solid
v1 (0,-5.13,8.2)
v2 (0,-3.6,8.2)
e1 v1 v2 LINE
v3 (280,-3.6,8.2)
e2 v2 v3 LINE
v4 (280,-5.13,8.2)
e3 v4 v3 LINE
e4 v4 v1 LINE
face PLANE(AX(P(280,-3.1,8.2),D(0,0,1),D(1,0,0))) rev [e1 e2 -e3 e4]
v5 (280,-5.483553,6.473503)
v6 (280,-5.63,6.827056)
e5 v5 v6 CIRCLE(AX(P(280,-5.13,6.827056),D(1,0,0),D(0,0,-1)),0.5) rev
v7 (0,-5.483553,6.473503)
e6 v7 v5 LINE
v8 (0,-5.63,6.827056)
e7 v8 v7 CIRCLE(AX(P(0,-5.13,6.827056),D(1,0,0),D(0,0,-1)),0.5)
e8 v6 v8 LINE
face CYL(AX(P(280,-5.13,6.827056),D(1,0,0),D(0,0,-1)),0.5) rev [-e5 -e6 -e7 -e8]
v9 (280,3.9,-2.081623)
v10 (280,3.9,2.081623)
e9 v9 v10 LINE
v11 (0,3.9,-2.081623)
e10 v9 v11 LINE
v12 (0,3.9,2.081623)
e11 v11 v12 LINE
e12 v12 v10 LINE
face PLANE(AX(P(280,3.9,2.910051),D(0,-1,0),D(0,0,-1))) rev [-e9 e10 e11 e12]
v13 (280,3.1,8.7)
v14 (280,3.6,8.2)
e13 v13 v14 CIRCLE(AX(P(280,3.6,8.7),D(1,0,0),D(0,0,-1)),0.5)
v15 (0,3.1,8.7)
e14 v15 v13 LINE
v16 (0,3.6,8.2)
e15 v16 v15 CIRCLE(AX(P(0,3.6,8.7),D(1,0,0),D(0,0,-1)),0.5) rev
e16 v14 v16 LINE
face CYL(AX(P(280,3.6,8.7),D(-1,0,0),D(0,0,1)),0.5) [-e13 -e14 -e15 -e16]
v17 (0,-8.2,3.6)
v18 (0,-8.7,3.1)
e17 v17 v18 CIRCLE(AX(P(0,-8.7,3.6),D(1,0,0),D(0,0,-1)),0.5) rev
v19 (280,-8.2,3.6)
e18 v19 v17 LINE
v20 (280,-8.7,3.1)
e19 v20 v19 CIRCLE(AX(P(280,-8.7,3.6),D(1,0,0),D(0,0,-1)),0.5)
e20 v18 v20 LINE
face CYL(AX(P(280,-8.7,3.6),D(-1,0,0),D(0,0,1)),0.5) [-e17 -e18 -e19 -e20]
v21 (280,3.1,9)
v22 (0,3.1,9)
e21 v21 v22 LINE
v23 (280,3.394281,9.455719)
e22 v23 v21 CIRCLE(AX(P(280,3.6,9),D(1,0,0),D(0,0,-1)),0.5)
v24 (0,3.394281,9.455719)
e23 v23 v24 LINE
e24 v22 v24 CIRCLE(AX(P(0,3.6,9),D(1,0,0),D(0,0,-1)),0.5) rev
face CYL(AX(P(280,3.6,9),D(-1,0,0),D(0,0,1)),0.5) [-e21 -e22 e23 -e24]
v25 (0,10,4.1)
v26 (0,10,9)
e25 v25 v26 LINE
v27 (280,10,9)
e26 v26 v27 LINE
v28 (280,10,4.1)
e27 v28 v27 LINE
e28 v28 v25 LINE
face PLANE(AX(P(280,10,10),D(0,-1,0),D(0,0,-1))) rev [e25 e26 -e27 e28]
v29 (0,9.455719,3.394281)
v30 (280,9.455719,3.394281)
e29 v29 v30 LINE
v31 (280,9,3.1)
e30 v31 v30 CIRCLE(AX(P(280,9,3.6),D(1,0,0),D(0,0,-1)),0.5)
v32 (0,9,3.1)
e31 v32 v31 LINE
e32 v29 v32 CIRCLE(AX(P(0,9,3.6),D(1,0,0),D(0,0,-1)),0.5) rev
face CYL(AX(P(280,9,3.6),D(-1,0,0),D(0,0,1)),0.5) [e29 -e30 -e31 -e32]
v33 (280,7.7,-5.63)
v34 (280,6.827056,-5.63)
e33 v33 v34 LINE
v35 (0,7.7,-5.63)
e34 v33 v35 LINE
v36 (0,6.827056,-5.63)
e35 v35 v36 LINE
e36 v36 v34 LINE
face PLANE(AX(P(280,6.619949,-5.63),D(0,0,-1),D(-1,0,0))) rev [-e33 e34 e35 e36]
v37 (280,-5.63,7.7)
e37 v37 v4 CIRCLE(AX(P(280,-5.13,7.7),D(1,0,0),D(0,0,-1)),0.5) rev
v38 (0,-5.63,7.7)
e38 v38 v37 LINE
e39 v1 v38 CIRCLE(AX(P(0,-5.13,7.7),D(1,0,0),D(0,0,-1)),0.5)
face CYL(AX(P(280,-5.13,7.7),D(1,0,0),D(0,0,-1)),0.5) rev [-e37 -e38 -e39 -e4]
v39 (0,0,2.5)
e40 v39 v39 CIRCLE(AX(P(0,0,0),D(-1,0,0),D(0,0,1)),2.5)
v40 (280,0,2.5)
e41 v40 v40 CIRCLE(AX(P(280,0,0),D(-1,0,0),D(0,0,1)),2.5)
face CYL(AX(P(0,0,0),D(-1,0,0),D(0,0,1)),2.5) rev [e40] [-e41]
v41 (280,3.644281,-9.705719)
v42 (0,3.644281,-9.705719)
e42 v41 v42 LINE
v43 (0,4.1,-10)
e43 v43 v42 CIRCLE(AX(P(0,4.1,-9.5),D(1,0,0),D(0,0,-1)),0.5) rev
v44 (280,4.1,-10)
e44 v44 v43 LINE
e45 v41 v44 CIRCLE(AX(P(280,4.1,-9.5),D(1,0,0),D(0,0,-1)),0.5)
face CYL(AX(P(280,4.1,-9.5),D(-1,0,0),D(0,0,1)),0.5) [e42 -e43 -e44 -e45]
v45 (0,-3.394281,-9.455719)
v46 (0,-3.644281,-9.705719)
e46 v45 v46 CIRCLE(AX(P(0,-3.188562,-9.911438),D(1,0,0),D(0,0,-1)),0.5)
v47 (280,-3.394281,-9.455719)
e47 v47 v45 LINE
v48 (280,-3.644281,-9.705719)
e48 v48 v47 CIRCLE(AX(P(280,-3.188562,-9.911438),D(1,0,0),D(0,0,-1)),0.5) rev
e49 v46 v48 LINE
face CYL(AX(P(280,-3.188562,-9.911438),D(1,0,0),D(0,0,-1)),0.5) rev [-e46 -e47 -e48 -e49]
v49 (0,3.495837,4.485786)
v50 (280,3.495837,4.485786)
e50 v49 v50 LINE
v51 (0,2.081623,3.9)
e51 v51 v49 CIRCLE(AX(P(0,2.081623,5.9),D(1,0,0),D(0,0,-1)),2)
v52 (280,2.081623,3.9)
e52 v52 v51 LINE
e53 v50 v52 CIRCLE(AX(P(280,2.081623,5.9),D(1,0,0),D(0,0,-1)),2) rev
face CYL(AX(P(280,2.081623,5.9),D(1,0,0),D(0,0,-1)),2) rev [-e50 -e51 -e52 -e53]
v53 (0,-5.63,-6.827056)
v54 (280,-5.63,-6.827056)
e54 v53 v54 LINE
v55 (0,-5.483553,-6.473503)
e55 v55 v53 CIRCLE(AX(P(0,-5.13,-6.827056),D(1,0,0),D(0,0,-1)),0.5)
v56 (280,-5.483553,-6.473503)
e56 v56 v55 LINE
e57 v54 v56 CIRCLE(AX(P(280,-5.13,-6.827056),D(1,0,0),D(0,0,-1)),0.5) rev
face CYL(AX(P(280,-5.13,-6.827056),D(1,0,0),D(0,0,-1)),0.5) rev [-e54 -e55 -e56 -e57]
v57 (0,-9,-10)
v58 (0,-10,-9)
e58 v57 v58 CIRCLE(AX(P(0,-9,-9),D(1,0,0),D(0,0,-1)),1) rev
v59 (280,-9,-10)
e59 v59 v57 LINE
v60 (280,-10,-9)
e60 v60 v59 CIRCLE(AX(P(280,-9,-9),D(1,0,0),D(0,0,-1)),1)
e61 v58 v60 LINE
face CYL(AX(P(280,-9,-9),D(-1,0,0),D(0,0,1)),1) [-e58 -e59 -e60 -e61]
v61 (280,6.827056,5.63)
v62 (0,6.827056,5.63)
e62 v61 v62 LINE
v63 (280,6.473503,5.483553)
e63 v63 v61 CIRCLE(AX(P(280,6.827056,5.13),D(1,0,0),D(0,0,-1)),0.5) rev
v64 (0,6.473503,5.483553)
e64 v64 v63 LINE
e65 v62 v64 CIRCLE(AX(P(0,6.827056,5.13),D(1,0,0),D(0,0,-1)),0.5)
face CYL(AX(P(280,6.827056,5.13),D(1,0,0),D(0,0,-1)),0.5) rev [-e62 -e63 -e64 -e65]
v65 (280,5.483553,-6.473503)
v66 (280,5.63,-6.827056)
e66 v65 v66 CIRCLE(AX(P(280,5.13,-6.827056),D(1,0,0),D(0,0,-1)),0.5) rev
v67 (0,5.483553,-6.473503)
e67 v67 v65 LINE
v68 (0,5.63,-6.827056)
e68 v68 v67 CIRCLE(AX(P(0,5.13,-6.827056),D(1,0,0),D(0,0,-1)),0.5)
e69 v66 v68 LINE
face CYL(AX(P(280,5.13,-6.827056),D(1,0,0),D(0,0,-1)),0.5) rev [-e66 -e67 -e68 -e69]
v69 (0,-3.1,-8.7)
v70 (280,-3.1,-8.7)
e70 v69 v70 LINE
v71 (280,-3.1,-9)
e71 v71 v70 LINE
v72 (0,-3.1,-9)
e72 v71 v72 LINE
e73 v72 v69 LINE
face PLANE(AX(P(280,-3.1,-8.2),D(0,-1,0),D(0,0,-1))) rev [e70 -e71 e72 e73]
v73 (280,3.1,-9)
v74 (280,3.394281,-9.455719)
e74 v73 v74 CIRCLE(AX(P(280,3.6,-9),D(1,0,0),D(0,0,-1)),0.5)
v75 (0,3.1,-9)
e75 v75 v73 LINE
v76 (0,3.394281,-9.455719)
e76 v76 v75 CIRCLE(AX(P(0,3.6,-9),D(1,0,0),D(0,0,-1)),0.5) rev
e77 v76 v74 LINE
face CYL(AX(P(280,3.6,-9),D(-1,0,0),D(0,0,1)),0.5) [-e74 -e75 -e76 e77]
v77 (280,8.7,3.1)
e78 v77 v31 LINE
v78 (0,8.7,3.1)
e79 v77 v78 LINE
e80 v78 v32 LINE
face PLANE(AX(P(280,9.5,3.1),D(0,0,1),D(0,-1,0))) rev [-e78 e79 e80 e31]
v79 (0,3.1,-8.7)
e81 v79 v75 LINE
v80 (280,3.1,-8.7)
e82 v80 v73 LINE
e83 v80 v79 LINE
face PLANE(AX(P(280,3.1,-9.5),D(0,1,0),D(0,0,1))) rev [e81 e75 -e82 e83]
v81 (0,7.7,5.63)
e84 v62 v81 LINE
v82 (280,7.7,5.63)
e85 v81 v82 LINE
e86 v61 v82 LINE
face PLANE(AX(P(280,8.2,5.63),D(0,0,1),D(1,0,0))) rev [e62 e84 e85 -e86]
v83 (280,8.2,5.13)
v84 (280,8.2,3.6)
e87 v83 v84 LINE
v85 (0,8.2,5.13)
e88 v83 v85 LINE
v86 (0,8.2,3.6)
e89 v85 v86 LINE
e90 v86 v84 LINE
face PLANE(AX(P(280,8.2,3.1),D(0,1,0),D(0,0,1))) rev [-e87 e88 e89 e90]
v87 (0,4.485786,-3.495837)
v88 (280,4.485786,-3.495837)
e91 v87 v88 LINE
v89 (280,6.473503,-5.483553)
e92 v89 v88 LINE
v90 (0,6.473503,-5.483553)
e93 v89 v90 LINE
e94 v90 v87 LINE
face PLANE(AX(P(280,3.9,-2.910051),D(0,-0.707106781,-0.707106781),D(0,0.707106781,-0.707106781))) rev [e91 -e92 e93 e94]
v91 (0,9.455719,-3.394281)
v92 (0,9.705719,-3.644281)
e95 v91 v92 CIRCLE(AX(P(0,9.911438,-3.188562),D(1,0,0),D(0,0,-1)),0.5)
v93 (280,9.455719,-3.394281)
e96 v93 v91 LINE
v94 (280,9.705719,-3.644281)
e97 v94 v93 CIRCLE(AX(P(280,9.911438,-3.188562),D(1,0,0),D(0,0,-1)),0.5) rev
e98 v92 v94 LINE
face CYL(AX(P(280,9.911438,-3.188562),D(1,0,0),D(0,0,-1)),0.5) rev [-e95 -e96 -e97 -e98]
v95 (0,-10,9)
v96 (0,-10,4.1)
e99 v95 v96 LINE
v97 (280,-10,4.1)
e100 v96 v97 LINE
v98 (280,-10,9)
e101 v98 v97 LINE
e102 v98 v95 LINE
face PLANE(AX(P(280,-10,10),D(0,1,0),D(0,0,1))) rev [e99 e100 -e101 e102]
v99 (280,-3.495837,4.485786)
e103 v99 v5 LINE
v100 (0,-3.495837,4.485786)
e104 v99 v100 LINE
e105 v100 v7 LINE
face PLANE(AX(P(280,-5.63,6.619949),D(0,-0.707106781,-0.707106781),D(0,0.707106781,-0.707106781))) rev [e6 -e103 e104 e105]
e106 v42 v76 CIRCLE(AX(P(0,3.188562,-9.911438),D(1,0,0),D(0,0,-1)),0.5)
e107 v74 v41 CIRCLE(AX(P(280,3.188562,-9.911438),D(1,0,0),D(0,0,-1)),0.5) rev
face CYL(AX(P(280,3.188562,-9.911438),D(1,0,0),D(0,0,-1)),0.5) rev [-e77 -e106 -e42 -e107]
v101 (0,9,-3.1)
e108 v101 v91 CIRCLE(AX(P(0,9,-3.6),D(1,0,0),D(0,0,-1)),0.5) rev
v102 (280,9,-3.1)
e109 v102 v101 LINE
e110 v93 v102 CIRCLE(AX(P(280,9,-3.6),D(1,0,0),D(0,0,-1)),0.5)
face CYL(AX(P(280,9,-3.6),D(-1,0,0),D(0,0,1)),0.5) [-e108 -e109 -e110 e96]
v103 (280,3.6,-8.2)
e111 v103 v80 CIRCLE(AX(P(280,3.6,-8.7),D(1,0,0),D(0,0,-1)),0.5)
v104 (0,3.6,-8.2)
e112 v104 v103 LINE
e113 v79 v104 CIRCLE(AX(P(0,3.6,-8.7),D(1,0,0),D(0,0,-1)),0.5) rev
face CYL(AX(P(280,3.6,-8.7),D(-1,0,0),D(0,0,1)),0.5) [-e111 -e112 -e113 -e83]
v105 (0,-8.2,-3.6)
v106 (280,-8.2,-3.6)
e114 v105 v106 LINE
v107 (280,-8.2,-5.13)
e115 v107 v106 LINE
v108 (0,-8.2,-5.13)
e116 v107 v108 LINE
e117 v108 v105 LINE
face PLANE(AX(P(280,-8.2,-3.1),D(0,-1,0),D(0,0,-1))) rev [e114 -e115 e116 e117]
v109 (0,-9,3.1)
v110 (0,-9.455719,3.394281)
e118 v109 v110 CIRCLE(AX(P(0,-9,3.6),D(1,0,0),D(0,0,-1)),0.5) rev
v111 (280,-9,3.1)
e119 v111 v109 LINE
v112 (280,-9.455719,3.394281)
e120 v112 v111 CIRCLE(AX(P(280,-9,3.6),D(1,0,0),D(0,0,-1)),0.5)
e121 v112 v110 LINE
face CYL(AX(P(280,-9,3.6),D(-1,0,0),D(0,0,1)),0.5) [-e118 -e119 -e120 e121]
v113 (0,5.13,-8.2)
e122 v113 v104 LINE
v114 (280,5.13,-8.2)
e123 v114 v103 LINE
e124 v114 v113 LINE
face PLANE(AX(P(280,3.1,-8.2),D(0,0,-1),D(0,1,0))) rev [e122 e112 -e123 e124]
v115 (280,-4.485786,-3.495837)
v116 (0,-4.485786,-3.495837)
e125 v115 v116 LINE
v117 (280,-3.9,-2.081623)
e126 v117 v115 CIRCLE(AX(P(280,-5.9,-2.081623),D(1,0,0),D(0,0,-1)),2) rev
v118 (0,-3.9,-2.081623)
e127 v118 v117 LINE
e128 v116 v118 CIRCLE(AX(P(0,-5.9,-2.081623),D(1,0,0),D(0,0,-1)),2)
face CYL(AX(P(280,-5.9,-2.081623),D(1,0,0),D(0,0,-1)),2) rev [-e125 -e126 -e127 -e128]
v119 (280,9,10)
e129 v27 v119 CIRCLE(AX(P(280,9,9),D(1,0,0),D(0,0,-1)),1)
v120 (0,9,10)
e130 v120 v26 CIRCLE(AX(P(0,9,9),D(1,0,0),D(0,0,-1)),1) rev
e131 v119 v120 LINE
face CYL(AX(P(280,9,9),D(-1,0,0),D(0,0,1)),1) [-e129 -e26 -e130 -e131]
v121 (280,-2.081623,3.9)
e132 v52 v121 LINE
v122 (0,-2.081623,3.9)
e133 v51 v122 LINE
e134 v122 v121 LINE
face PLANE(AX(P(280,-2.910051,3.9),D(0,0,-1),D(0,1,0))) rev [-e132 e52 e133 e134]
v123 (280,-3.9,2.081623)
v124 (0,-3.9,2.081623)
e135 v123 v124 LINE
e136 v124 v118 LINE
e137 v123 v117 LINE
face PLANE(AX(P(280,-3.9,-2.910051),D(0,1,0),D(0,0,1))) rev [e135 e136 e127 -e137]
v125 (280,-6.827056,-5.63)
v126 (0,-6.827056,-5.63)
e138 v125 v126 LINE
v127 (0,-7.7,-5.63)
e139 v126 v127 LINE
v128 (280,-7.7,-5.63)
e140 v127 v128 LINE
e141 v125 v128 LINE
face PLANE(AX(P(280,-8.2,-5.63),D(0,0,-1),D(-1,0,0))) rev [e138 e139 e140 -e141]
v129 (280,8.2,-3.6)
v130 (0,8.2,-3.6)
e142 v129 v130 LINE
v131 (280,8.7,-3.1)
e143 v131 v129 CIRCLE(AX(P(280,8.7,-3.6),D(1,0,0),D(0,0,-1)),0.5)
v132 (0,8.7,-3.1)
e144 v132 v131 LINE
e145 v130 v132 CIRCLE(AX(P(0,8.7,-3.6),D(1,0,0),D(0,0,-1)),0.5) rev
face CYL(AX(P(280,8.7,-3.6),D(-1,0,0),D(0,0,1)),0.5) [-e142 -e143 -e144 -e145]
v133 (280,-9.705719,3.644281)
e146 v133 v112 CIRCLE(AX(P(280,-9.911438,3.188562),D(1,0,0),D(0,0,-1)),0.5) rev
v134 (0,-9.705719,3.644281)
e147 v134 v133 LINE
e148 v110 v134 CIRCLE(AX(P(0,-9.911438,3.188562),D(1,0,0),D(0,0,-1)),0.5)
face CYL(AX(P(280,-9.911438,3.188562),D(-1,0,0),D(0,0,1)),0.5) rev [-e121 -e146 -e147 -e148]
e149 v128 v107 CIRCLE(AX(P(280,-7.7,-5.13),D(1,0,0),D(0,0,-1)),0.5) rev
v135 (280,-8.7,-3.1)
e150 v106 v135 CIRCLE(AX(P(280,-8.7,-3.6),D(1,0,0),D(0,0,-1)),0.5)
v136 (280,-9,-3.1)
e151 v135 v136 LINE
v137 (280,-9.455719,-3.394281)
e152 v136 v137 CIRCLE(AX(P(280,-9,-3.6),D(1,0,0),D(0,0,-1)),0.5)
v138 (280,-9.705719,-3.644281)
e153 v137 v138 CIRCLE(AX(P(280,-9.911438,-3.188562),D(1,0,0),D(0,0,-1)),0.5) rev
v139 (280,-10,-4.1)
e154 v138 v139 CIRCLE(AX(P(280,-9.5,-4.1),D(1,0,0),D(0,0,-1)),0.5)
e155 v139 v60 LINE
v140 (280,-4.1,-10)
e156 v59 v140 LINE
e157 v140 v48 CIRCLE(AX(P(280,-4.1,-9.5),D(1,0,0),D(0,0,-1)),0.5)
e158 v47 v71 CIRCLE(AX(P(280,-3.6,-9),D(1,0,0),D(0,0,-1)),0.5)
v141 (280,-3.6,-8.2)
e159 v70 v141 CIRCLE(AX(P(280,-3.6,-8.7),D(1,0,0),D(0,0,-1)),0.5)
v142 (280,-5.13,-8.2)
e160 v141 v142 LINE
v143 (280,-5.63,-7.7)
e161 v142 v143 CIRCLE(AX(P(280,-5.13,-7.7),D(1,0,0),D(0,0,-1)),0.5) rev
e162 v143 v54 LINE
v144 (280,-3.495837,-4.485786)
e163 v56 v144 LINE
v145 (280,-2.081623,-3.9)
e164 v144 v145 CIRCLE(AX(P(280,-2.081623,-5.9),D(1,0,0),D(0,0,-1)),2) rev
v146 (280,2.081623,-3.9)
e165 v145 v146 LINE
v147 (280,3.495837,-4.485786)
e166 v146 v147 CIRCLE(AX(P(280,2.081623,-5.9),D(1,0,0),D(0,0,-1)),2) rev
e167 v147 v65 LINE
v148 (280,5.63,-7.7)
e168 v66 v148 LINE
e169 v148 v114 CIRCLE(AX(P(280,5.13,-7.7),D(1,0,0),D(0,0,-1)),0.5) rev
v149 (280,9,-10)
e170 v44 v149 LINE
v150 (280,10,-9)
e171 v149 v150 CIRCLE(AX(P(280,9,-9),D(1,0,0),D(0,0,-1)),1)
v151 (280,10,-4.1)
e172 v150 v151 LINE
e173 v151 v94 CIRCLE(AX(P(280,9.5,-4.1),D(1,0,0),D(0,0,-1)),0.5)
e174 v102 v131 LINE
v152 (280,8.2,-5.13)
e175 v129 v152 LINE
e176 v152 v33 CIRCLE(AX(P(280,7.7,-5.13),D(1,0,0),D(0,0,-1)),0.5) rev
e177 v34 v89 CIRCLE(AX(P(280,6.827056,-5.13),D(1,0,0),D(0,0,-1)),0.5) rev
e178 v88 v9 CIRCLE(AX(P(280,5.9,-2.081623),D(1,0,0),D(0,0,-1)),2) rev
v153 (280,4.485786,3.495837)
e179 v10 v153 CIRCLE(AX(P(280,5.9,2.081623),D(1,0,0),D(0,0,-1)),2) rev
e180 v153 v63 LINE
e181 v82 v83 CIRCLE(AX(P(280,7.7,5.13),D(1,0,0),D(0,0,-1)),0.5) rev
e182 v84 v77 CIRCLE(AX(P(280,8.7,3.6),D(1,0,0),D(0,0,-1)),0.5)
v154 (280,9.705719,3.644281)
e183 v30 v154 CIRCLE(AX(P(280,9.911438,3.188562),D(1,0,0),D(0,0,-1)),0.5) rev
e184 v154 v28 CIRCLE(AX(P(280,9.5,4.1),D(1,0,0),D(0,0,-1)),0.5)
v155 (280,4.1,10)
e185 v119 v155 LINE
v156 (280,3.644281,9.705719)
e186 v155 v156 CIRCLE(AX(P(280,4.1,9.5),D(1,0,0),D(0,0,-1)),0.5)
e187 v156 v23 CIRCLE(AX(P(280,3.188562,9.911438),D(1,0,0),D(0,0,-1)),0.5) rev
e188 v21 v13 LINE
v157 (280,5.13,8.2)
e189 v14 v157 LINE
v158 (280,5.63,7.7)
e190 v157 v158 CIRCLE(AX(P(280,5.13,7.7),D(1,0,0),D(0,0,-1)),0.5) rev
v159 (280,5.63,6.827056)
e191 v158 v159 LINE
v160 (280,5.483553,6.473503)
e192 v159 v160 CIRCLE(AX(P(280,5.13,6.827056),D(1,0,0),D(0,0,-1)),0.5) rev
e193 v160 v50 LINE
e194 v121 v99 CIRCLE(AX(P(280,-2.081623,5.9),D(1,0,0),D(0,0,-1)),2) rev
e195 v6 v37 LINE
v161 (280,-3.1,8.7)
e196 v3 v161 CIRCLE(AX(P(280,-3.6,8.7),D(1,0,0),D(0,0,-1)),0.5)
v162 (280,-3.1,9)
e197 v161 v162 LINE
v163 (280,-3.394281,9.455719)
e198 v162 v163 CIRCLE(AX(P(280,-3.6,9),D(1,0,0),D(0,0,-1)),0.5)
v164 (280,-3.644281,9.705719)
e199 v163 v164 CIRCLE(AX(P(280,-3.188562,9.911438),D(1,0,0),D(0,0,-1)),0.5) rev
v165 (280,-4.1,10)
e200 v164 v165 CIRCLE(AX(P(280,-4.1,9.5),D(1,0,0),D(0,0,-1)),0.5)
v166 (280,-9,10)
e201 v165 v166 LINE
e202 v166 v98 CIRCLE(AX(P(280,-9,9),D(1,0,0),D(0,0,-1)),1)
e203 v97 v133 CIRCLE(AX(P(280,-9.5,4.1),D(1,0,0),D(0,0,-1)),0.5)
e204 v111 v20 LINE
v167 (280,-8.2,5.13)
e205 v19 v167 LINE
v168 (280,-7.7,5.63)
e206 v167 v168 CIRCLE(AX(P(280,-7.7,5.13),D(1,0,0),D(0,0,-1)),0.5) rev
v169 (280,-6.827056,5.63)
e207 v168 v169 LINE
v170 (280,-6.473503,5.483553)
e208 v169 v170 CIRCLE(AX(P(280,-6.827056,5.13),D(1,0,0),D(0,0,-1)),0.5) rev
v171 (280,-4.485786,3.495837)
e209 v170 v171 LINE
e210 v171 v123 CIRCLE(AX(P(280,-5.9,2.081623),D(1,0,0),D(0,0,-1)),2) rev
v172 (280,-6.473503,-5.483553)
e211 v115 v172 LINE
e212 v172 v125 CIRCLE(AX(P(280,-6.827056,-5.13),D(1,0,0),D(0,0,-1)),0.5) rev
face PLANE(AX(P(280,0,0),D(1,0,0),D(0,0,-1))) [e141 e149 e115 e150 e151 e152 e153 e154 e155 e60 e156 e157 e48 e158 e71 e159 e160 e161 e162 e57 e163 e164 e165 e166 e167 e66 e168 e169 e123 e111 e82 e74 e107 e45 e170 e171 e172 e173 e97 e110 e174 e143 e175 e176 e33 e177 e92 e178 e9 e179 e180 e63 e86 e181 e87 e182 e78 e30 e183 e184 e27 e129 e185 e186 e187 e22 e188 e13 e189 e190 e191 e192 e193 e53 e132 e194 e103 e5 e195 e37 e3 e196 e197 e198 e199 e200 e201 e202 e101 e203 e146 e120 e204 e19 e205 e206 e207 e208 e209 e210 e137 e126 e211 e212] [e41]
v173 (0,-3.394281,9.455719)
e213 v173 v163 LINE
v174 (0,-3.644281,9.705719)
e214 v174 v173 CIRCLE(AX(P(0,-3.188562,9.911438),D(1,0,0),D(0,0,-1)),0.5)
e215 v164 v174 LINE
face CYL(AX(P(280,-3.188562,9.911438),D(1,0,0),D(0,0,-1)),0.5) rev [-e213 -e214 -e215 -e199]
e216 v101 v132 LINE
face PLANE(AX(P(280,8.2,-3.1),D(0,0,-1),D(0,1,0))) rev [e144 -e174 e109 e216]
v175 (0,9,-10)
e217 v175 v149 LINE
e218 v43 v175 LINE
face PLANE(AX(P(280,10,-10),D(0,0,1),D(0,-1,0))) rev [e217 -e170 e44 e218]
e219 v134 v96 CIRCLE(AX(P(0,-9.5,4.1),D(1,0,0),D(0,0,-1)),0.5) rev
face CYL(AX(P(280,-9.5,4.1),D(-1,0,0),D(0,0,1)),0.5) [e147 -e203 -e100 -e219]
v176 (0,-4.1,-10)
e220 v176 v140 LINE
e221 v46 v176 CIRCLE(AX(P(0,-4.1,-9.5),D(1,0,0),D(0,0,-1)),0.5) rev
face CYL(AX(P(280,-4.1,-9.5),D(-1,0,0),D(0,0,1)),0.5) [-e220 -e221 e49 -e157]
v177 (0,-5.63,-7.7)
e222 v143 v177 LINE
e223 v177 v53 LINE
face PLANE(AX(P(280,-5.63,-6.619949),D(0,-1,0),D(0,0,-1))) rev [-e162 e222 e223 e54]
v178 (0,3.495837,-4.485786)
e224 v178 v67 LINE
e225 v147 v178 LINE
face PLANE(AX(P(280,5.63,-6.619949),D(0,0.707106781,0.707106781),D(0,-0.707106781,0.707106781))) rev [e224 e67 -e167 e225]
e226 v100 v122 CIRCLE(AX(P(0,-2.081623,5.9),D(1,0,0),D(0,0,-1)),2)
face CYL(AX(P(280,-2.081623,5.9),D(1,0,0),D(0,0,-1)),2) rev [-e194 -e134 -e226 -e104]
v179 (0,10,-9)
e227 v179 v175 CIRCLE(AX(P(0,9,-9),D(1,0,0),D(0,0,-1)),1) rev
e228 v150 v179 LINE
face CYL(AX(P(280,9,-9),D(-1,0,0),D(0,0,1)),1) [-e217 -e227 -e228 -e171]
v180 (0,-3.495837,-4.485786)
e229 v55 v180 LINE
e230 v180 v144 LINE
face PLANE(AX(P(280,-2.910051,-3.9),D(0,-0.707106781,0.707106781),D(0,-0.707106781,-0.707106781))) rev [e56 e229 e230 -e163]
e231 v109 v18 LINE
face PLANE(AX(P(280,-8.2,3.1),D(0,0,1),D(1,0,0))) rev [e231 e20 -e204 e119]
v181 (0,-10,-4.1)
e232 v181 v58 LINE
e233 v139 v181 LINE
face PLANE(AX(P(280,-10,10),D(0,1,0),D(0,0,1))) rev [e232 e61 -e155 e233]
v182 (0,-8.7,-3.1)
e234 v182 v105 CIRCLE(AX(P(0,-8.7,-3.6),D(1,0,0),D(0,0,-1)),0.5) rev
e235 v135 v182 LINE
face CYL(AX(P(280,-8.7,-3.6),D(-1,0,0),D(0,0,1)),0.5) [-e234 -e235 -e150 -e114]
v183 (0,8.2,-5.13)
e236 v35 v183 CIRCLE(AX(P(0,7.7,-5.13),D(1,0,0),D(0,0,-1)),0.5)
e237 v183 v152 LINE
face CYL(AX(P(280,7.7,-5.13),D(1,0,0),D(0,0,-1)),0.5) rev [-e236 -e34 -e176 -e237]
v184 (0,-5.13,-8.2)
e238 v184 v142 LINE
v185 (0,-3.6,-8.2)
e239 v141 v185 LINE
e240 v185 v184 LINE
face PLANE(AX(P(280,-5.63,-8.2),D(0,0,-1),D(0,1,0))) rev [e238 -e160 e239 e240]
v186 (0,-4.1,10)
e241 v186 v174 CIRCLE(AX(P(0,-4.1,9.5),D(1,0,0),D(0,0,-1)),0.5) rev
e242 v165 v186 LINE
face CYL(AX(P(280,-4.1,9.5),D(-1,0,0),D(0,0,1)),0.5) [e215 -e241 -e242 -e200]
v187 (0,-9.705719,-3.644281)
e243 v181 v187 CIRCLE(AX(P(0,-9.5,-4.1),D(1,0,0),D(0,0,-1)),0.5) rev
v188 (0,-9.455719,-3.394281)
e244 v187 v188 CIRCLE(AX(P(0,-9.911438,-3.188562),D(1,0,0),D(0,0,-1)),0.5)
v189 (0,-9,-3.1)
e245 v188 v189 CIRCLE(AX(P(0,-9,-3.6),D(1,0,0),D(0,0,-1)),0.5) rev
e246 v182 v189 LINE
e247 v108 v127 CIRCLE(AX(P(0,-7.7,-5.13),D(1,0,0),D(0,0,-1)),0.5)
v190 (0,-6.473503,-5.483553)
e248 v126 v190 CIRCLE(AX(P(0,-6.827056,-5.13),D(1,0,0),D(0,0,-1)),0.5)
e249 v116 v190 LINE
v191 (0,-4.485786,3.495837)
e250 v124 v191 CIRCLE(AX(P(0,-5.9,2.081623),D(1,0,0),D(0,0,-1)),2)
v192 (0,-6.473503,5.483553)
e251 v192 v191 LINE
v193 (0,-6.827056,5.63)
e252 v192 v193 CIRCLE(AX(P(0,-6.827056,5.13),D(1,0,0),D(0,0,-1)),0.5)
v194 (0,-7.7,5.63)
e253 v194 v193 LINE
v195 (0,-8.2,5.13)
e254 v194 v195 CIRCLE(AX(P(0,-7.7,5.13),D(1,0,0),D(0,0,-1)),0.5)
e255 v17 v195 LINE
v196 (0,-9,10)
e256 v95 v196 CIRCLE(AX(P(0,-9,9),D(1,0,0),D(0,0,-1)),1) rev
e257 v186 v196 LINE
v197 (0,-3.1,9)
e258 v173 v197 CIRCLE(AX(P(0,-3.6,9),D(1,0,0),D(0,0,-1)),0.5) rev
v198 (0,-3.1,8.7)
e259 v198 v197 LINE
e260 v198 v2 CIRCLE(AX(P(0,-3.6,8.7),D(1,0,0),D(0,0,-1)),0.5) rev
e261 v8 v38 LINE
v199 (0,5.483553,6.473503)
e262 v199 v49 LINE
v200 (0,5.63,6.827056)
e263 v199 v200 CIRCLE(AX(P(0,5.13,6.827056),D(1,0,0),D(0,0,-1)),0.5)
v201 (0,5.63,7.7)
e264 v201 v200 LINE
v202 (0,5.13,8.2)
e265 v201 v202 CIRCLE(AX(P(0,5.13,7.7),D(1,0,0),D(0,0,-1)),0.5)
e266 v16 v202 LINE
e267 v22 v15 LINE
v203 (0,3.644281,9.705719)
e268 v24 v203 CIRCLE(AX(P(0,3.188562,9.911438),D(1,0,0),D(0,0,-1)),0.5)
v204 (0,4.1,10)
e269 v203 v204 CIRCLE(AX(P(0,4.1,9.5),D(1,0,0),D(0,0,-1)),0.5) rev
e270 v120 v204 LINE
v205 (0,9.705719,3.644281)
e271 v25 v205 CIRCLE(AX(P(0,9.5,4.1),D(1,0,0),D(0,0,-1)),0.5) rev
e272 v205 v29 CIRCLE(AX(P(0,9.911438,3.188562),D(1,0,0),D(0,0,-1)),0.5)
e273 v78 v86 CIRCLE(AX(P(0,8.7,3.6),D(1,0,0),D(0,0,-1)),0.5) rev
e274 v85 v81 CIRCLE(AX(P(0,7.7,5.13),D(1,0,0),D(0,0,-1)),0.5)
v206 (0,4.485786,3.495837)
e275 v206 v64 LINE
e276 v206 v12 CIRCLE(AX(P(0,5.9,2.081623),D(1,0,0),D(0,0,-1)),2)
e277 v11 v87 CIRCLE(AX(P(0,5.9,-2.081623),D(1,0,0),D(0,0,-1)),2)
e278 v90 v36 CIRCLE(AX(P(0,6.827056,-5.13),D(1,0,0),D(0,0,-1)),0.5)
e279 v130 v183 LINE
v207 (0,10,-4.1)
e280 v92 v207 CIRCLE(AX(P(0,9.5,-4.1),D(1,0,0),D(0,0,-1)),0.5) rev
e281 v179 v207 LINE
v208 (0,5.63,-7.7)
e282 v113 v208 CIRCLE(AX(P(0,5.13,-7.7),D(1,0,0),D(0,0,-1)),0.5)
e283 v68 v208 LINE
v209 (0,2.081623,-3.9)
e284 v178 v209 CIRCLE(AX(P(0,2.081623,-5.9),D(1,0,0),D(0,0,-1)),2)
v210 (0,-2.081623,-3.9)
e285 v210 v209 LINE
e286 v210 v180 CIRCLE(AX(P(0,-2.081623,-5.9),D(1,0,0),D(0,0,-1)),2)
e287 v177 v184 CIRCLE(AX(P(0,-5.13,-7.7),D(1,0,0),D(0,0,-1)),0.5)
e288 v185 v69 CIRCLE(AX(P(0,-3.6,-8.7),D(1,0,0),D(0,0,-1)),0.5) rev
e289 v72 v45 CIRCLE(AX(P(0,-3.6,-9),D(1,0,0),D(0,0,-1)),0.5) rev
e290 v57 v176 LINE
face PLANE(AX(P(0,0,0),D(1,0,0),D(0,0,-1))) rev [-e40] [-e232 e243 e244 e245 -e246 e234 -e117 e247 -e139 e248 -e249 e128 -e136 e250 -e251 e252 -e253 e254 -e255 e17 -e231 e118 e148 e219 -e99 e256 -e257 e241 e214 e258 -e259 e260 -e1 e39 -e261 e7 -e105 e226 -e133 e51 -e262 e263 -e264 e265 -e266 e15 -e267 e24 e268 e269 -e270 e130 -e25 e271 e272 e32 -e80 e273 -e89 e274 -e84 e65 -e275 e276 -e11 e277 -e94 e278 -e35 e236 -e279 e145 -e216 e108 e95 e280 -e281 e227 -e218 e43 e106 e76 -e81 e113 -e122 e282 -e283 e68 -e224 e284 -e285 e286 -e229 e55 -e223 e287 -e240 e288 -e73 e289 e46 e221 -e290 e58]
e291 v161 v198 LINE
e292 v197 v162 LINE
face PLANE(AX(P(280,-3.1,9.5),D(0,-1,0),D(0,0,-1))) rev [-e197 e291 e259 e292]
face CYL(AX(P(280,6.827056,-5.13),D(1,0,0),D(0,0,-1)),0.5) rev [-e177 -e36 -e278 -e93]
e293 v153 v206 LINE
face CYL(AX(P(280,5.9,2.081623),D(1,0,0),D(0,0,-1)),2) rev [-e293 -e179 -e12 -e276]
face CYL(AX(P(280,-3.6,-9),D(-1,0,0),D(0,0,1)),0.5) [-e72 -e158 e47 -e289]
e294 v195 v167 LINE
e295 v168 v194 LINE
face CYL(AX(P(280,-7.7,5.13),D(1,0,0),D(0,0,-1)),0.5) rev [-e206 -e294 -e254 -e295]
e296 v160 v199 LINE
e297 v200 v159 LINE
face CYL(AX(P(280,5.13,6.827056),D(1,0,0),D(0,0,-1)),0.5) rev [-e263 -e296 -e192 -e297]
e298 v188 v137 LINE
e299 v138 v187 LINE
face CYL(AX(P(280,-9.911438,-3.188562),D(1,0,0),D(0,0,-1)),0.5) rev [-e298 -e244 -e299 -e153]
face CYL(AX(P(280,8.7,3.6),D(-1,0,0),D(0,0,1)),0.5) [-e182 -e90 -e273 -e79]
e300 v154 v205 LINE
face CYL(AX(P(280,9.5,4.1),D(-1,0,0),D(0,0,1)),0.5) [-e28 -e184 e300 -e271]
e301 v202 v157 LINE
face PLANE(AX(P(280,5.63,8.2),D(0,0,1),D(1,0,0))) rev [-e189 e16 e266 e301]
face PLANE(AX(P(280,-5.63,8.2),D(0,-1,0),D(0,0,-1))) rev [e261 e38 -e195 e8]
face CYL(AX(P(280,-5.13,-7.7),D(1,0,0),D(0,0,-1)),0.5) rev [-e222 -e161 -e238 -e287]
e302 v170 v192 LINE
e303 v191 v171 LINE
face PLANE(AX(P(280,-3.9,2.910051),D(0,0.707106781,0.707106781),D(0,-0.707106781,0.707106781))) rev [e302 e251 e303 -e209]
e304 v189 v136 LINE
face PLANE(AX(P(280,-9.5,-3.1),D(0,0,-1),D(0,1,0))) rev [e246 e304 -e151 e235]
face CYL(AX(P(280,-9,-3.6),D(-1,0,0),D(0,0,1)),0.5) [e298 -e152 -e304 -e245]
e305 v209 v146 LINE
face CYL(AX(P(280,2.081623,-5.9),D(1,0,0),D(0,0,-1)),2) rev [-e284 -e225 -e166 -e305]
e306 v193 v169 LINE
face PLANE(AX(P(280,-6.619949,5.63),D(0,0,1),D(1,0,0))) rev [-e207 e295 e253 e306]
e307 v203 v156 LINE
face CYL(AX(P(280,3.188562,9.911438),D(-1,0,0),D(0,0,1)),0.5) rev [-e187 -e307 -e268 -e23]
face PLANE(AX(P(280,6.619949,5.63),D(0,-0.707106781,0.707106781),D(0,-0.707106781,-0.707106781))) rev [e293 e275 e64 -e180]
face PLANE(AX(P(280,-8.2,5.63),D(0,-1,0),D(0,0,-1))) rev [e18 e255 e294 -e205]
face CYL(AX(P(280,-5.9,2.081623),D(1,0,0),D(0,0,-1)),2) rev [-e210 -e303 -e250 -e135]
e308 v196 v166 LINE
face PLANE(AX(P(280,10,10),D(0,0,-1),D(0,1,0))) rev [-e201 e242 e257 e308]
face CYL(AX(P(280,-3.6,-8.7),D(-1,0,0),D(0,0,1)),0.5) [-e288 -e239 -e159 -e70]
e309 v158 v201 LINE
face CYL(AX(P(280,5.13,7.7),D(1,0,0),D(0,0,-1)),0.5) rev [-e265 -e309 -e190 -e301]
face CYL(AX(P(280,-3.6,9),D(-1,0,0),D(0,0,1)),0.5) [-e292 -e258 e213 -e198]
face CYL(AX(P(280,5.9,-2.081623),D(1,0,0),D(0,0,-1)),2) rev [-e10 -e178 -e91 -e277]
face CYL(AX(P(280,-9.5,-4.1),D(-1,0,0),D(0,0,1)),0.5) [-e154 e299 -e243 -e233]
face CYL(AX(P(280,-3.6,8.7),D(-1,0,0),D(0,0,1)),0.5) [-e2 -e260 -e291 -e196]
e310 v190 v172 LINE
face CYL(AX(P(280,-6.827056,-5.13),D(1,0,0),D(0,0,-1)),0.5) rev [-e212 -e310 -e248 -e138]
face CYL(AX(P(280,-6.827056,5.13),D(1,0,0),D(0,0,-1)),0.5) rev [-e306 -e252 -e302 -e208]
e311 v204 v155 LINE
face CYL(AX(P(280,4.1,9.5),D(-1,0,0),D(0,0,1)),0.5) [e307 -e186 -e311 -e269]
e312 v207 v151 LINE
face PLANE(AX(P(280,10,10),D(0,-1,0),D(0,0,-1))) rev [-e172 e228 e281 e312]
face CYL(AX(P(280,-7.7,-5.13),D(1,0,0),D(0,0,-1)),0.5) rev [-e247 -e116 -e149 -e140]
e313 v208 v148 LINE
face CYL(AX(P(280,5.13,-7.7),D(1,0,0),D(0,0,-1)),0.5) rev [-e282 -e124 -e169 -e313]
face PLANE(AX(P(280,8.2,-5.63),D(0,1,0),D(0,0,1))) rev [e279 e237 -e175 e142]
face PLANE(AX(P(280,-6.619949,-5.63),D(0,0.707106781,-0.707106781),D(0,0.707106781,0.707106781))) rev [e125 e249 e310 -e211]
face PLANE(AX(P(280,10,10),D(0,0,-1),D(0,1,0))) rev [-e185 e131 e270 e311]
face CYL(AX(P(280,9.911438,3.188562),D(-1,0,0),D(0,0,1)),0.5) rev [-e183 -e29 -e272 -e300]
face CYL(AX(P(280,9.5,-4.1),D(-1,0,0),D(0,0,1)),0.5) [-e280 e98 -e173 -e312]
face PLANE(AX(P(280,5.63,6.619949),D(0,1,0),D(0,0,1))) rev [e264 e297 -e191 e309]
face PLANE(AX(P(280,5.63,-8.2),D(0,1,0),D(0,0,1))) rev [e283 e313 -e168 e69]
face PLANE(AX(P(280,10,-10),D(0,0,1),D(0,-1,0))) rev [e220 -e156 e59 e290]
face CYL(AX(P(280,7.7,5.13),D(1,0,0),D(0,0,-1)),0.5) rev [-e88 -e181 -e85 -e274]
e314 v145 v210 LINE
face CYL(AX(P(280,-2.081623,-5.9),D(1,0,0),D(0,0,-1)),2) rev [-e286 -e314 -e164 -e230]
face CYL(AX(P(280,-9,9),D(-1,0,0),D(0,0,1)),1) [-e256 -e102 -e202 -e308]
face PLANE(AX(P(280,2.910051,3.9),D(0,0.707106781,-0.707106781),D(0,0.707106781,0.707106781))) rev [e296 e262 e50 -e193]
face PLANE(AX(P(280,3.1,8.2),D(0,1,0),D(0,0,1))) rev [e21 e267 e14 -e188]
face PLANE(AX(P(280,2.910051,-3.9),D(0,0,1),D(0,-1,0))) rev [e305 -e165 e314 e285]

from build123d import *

# Parameters (mm, degrees)
SKETCH1_W                = 20
SKETCH1_H                = 20
BOSS_EXTRUDE1_DEPTH      = 280
FILLET1_R                = 1
CUT_EXTRUDE1_DEPTH       = 281.356915378
F_5_0_5_DIAMETER_HOLE1_D = 5
FILLET2_R                = 2
FILLET3_R                = 0.5
FILLET4_R                = 0.5
FILLET5_R                = 0.5


with BuildPart() as part:
    # Sketch1 → Boss-Extrude1 (new body)
    with BuildSketch(Plane(origin=(0, 0, 0), x_dir=(0, 0, -1), z_dir=(1, 0, 0))):
        Rectangle(SKETCH1_W, SKETCH1_H)
    extrude(amount=BOSS_EXTRUDE1_DEPTH)

    # Fillet1
    fillet1_edges = [part.edges().sort_by_distance(p)[0] for p in [
        (140, 10, 10),
        (140, 10, -10),
        (140, -10, -10),
        (140, -10, 10),
    ]]
    fillet(fillet1_edges, radius=FILLET1_R)

    # Sketch3 → Cut-Extrude1 (cut, through all)
    with BuildSketch(Plane.ZY):
        Polygon((-3.6, 10), (3.6, 10), (3.6, 9.5), (3.1, 9.5), (3.1, 8.2), (5.63, 8.2), (5.63, 6.619949494), (2.910050506, 3.9), (-2.910050506, 3.9), (-5.63, 6.619949494), (-5.63, 8.2), (-3.1, 8.2), (-3.1, 9.5), (-3.6, 9.5), align=None)
        Polygon((10, 3.6), (10, -3.6), (9.5, -3.6), (9.5, -3.1), (8.2, -3.1), (8.2, -5.63), (6.619949494, -5.63), (3.9, -2.910050506), (3.9, 2.910050506), (6.619949494, 5.63), (8.2, 5.63), (8.2, 3.1), (9.5, 3.1), (9.5, 3.6), align=None)
        Polygon((3.6, -10), (-3.6, -10), (-3.6, -9.5), (-3.1, -9.5), (-3.1, -8.2), (-5.63, -8.2), (-5.63, -6.619949494), (-2.910050506, -3.9), (2.910050506, -3.9), (5.63, -6.619949494), (5.63, -8.2), (3.1, -8.2), (3.1, -9.5), (3.6, -9.5), align=None)
        Polygon((-10, -3.6), (-10, 3.6), (-9.5, 3.6), (-9.5, 3.1), (-8.2, 3.1), (-8.2, 5.63), (-6.619949494, 5.63), (-3.9, 2.910050506), (-3.9, -2.910050506), (-6.619949494, -5.63), (-8.2, -5.63), (-8.2, -3.1), (-9.5, -3.1), (-9.5, -3.6), align=None)
    extrude(amount=-CUT_EXTRUDE1_DEPTH, mode=Mode.SUBTRACT)

    # Ø5.0 (5) Diameter Hole1 (through all)
    with Locations(Plane.ZY):
        with Locations((0, 0)):
            Hole(F_5_0_5_DIAMETER_HOLE1_D / 2)

    # Fillet2
    fillet2_edges = [part.edges().sort_by_distance(p)[0] for p in [
        (140, -3.9, -2.910050506),
        (140, -3.9, 2.910050506),
        (140, 2.910050506, -3.9),
        (140, -2.910050506, -3.9),
        (140, -2.910050506, 3.9),
        (140, 2.910050506, 3.9),
        (140, 3.9, 2.910050506),
        (140, 3.9, -2.910050506),
    ]]
    fillet(fillet2_edges, radius=FILLET2_R)

    # Fillet3
    fillet3_edges = [part.edges().sort_by_distance(p)[0] for p in [
        (140, 3.6, -10),
        (140, 3.1, -9.5),
        (140, 3.1, -8.2),
        (140, 5.63, -8.2),
        (140, 5.63, -6.619949494),
        (140, 3.6, 10),
        (140, 3.1, 9.5),
        (140, 3.1, 8.2),
        (140, 5.63, 8.2),
        (140, 5.63, 6.619949494),
        (140, 6.619949494, 5.63),
        (140, 8.2, 5.63),
        (140, 8.2, 3.1),
        (140, 9.5, 3.1),
        (140, 10, 3.6),
        (140, 9.5, -3.1),
        (140, 10, -3.6),
        (140, 8.2, -3.1),
        (140, 8.2, -5.63),
        (140, 6.619949494, -5.63),
    ]]
    fillet(fillet3_edges, radius=FILLET3_R - 0.0001)  # a hair under: the kernel refuses the full size

    # Fillet4
    fillet4_edges = [part.edges().sort_by_distance(p)[0] for p in [
        (140, -3.6, 10),
        (140, -3.1, 9.5),
        (140, -3.1, 8.2),
        (140, -5.63, 8.2),
        (140, -5.63, 6.619949494),
        (140, -6.619949494, 5.63),
        (140, -8.2, 5.63),
        (140, -8.2, 3.1),
        (140, -10, 3.6),
        (140, -9.5, 3.1),
        (140, -10, -3.6),
        (140, -9.5, -3.1),
        (140, -8.2, -3.1),
        (140, -8.2, -5.63),
        (140, -6.619949494, -5.63),
        (140, -5.63, -6.619949494),
        (140, -5.63, -8.2),
        (140, -3.1, -8.2),
        (140, -3.1, -9.5),
        (140, -3.6, -10),
    ]]
    fillet(fillet4_edges, radius=FILLET4_R - 0.0001)  # a hair under: the kernel refuses the full size

    # Fillet5
    fillet5_edges = [part.edges().sort_by_distance(p)[0] for p in [
        (140, 3.6, 9.5),
        (140, 9.5, 3.6),
        (140, 9.5, -3.6),
        (140, 3.6, -9.5),
        (140, -3.6, 9.5),
        (140, -9.5, 3.6),
        (140, -9.5, -3.6),
        (140, -3.6, -9.5),
    ]]
    fillet(fillet5_edges, radius=FILLET5_R)


solid = part.part
